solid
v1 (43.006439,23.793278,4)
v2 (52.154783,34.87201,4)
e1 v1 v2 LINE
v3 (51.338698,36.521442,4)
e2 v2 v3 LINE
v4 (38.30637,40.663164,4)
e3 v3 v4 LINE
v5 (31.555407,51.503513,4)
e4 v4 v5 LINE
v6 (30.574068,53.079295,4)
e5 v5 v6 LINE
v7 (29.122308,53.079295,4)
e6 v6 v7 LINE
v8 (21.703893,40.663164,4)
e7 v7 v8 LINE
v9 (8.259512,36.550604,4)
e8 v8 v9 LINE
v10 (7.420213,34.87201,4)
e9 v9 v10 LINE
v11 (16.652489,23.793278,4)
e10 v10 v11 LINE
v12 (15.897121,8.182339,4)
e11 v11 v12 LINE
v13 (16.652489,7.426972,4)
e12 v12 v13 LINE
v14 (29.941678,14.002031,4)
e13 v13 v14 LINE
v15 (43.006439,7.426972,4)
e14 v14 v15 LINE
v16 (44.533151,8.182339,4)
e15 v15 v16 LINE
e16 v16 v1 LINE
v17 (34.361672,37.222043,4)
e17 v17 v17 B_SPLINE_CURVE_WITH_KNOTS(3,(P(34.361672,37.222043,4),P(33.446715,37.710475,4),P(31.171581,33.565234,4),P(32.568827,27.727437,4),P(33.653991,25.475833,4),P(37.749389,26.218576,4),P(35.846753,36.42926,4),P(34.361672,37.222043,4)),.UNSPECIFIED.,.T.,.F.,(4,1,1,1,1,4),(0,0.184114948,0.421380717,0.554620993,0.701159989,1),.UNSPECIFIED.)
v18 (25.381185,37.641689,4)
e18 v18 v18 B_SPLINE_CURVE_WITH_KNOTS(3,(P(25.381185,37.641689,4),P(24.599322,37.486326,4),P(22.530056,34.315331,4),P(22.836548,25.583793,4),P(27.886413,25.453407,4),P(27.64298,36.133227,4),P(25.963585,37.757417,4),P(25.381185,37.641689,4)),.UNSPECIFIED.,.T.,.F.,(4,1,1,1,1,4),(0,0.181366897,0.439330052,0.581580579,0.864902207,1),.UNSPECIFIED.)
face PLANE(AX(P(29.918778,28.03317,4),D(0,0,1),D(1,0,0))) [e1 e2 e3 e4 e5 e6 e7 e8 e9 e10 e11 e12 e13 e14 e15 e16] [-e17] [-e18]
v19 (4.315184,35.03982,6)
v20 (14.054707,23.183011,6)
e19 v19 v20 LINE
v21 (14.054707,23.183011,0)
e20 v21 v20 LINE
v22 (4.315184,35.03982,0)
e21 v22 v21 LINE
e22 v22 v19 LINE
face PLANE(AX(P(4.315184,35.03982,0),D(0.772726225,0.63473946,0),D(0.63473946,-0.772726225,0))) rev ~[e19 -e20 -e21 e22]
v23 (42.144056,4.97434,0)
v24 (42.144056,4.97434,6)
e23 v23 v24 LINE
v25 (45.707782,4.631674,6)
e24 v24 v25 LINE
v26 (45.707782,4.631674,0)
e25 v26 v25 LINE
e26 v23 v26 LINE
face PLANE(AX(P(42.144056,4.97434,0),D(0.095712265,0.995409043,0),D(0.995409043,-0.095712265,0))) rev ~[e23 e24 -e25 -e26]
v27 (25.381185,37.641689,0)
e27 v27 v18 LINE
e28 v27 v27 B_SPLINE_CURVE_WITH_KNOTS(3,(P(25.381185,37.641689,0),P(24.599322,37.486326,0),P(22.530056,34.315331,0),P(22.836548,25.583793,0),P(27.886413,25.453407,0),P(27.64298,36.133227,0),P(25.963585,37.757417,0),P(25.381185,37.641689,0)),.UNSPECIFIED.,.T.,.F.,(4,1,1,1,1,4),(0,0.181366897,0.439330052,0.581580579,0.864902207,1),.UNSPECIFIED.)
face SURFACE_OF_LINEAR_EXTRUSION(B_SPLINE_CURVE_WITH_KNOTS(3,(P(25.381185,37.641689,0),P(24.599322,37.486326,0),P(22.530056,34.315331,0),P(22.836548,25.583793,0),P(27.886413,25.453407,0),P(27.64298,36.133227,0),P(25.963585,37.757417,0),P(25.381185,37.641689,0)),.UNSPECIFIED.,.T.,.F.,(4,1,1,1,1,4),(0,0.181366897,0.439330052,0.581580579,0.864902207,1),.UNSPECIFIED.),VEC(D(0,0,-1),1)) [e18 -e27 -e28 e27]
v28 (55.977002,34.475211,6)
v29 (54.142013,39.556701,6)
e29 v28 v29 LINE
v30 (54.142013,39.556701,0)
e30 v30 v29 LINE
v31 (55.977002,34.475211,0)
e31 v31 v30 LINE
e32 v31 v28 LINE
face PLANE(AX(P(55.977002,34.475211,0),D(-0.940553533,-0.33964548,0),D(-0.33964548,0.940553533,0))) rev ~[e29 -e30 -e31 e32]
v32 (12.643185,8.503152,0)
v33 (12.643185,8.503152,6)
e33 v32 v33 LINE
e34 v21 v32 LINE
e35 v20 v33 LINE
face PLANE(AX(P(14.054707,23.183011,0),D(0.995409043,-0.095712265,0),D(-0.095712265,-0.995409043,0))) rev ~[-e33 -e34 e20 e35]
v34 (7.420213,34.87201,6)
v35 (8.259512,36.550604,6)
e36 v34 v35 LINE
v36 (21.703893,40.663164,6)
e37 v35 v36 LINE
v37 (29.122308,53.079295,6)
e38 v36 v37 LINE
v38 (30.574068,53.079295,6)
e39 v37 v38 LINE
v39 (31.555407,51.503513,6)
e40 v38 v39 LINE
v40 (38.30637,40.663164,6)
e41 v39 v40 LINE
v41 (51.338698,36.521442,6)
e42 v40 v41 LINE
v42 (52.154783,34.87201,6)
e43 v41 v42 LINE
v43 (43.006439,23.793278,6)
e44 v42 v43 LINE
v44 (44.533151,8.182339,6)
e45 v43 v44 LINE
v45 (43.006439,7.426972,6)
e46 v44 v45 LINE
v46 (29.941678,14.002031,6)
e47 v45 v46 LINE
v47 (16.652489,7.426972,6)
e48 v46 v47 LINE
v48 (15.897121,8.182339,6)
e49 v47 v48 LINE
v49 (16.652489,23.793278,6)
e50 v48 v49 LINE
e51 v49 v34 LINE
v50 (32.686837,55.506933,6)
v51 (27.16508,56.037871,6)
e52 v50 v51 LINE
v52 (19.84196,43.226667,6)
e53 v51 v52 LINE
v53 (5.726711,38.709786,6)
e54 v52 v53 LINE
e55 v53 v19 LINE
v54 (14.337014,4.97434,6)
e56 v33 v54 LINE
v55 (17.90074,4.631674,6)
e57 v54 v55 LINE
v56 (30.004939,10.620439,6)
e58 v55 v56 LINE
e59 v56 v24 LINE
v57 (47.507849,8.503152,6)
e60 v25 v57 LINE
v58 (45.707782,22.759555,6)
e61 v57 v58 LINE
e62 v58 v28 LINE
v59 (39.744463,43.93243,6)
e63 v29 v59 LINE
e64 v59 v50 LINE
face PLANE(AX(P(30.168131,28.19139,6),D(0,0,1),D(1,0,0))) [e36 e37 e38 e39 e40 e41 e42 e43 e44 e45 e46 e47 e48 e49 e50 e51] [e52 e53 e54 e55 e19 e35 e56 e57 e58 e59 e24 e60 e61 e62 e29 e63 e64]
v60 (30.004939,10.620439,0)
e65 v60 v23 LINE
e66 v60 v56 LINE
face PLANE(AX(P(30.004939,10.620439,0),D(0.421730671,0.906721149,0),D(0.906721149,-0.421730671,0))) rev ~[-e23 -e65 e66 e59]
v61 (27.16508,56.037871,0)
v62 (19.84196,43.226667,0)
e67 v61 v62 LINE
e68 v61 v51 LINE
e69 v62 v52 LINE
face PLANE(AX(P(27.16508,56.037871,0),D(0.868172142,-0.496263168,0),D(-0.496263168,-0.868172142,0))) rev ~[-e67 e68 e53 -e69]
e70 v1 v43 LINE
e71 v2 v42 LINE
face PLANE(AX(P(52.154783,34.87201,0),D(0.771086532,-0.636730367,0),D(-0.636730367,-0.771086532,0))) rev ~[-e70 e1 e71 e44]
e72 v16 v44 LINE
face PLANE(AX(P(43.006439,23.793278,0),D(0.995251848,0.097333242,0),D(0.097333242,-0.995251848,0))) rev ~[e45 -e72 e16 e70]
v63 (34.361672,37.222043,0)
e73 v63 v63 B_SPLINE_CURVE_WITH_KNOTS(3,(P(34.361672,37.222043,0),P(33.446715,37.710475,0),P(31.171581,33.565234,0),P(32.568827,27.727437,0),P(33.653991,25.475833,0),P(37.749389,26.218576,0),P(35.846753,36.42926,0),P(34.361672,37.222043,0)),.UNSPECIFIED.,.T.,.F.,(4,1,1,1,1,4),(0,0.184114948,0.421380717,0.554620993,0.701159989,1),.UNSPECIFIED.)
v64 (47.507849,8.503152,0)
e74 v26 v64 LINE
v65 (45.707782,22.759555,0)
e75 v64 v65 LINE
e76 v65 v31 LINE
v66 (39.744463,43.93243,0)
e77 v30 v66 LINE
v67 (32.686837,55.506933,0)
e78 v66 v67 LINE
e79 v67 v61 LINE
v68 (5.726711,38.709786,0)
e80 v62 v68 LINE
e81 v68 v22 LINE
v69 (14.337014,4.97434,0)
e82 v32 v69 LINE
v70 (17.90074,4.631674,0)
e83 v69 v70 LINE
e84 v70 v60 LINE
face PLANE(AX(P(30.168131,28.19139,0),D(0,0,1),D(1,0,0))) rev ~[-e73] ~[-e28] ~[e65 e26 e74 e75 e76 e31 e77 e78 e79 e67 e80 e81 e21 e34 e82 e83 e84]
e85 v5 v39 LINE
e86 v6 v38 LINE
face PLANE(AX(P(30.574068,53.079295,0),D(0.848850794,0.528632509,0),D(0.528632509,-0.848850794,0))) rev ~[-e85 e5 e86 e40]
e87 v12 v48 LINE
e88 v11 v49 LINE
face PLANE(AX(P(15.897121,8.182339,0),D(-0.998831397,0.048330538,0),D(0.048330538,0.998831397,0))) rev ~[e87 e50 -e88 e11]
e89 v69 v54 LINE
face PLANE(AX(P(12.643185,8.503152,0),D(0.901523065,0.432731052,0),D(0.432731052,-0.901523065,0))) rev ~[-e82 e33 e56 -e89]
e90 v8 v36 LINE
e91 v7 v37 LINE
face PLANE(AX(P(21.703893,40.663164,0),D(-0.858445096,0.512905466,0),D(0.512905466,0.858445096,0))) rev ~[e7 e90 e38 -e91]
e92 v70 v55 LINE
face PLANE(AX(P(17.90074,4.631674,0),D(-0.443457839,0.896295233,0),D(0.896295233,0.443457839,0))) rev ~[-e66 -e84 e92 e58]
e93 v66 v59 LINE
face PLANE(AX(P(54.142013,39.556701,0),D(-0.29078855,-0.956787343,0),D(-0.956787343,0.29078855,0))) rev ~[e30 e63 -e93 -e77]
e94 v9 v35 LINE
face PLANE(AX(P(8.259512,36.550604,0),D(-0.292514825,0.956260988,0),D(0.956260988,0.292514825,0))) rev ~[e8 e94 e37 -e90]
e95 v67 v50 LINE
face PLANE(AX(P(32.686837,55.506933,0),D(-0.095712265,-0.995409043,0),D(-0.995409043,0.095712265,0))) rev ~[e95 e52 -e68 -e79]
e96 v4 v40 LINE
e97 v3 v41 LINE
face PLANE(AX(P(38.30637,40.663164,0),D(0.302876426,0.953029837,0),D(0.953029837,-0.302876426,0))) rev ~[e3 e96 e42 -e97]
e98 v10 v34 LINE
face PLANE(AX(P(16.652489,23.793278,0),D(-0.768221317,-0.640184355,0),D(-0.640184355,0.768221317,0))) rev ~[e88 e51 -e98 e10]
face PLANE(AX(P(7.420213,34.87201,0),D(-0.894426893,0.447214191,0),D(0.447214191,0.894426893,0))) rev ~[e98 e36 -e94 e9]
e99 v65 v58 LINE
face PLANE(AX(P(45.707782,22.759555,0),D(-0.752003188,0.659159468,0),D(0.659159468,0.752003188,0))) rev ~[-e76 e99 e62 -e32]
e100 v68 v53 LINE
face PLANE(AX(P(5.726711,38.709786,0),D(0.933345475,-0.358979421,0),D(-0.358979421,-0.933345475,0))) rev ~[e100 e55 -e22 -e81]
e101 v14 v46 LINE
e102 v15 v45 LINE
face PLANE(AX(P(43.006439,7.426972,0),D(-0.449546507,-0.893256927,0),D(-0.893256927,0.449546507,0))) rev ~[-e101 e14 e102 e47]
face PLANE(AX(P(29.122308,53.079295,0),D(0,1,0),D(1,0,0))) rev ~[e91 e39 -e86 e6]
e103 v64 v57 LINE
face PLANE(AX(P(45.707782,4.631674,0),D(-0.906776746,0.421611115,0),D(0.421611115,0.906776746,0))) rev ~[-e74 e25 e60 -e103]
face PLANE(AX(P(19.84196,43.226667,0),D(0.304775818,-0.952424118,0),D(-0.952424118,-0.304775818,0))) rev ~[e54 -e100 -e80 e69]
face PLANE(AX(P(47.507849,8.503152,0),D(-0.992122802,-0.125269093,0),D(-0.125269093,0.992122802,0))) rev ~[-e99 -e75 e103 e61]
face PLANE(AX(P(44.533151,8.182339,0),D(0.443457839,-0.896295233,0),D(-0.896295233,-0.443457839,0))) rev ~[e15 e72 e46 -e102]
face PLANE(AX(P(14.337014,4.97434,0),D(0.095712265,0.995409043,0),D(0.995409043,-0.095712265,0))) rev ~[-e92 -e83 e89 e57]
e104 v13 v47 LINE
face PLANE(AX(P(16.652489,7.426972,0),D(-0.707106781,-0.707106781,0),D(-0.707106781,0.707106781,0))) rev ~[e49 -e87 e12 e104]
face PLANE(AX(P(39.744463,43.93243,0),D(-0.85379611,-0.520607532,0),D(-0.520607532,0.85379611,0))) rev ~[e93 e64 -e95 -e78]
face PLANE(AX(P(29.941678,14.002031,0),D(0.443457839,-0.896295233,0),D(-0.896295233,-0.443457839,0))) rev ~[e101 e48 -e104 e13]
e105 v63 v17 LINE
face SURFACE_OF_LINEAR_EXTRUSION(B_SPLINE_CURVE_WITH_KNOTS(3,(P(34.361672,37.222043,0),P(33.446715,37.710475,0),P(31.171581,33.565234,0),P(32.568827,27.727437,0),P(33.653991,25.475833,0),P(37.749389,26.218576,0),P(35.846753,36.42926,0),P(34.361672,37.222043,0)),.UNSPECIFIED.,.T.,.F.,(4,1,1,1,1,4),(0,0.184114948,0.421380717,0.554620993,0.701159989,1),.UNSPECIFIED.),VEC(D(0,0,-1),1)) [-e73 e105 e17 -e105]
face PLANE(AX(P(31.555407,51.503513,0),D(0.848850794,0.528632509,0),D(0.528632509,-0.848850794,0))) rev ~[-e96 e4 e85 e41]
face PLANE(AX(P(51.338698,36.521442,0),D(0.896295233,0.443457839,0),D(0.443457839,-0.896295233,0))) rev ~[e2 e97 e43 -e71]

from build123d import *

# Parameters (mm, degrees)
F1_DEPTH = 4
F2_DEPTH = 6


# Not quite as in the source:
# - the program builds the solid bodies; features that only make, move or delete a surface that nothing else refers to are left out


with BuildPart() as f1:
    # F0 (on Top) → F1 (new body)
    with BuildSketch(Plane.XY):
        Polygon((21.7038933188, 40.663164109), (8.2595115528, 36.550603807), (7.4202134274, 34.8720103502), (16.652489081, 23.793278262), (15.8971212804, 8.1823393703), (16.652489081, 7.4269715697), (29.9416775716, 14.0020314224), (43.0064387619, 7.4269715697), (44.5331511124, 8.1823393703), (43.0064387619, 23.793278262), (52.1547831595, 34.8720103502), (51.3386978339, 36.5214419841), (38.3063703775, 40.663164109), (31.5554067492, 51.5035130084), (30.5740684422, 53.0792954037), (29.1223078966, 53.0792954037), align=None)
        with BuildLine():
            add(Edge.make_bspline(
                [(25.3811851144, 37.6416891813), (24.5993217345, 37.4863257412), (22.5300561127, 34.3153306276), (22.8365480412, 25.5837934463), (27.8864125101, 25.4534071145), (27.6429800893, 36.1332272512), (25.9635847642, 37.7574173449), (25.3811851144, 37.6416891813)],
                knots=[0, 0, 0, 0, 0.1813668972, 0.4393300523, 0.5815805793, 0.8649022066, 1, 1, 1, 1], degree=3))
        make_face(mode=Mode.SUBTRACT)
        with BuildLine():
            add(Edge.make_bspline(
                [(34.3616716564, 37.2220426798), (33.4467151003, 37.7104749668), (31.1715810093, 33.5652339009), (32.5688269727, 27.7274369068), (33.6539912936, 25.4758331021), (37.7493894328, 26.2185759497), (35.846752744, 36.4292601731), (34.3616716564, 37.2220426798)],
                knots=[0, 0, 0, 0, 0.1841149483, 0.4213807172, 0.554620993, 0.7011599886, 1, 1, 1, 1], degree=3))
        make_face(mode=Mode.SUBTRACT)
    extrude(amount=F1_DEPTH)

    # F0 (on Top) → F2 (join)
    with BuildSketch(Plane.XY):
        Polygon((27.1650796672, 56.0378708923), (19.8419597, 43.2266667485), (5.7267113589, 38.7097857893), (4.3151844293, 35.039819777), (14.0547072515, 23.1830105186), (12.6431845129, 8.5031520575), (14.3370144069, 4.974339623), (17.900740458, 4.6316741696), (30.0049390644, 10.6204394251), (42.1440564096, 4.974339623), (45.7077824607, 4.6316741696), (47.5078485906, 8.5031520575), (45.7077824607, 22.7595549077), (55.9770017862, 34.4752110541), (54.1420131922, 39.5567007363), (39.7444628179, 43.9324304461), (32.6868370175, 55.5069334805), align=None)
        Polygon((7.4202134274, 34.8720103502), (8.2595115528, 36.550603807), (21.7038933188, 40.663164109), (29.1223078966, 53.0792954037), (30.5740684422, 53.0792954037), (31.5554067492, 51.5035130084), (38.3063703775, 40.663164109), (51.3386978339, 36.5214419841), (52.1547831595, 34.8720103502), (43.0064387619, 23.793278262), (44.5331511124, 8.1823393703), (43.0064387619, 7.4269715697), (29.9416775716, 14.0020314224), (16.652489081, 7.4269715697), (15.8971212804, 8.1823393703), (16.652489081, 23.793278262), align=None, mode=Mode.SUBTRACT)
    extrude(amount=F2_DEPTH)


solid = f1.part
